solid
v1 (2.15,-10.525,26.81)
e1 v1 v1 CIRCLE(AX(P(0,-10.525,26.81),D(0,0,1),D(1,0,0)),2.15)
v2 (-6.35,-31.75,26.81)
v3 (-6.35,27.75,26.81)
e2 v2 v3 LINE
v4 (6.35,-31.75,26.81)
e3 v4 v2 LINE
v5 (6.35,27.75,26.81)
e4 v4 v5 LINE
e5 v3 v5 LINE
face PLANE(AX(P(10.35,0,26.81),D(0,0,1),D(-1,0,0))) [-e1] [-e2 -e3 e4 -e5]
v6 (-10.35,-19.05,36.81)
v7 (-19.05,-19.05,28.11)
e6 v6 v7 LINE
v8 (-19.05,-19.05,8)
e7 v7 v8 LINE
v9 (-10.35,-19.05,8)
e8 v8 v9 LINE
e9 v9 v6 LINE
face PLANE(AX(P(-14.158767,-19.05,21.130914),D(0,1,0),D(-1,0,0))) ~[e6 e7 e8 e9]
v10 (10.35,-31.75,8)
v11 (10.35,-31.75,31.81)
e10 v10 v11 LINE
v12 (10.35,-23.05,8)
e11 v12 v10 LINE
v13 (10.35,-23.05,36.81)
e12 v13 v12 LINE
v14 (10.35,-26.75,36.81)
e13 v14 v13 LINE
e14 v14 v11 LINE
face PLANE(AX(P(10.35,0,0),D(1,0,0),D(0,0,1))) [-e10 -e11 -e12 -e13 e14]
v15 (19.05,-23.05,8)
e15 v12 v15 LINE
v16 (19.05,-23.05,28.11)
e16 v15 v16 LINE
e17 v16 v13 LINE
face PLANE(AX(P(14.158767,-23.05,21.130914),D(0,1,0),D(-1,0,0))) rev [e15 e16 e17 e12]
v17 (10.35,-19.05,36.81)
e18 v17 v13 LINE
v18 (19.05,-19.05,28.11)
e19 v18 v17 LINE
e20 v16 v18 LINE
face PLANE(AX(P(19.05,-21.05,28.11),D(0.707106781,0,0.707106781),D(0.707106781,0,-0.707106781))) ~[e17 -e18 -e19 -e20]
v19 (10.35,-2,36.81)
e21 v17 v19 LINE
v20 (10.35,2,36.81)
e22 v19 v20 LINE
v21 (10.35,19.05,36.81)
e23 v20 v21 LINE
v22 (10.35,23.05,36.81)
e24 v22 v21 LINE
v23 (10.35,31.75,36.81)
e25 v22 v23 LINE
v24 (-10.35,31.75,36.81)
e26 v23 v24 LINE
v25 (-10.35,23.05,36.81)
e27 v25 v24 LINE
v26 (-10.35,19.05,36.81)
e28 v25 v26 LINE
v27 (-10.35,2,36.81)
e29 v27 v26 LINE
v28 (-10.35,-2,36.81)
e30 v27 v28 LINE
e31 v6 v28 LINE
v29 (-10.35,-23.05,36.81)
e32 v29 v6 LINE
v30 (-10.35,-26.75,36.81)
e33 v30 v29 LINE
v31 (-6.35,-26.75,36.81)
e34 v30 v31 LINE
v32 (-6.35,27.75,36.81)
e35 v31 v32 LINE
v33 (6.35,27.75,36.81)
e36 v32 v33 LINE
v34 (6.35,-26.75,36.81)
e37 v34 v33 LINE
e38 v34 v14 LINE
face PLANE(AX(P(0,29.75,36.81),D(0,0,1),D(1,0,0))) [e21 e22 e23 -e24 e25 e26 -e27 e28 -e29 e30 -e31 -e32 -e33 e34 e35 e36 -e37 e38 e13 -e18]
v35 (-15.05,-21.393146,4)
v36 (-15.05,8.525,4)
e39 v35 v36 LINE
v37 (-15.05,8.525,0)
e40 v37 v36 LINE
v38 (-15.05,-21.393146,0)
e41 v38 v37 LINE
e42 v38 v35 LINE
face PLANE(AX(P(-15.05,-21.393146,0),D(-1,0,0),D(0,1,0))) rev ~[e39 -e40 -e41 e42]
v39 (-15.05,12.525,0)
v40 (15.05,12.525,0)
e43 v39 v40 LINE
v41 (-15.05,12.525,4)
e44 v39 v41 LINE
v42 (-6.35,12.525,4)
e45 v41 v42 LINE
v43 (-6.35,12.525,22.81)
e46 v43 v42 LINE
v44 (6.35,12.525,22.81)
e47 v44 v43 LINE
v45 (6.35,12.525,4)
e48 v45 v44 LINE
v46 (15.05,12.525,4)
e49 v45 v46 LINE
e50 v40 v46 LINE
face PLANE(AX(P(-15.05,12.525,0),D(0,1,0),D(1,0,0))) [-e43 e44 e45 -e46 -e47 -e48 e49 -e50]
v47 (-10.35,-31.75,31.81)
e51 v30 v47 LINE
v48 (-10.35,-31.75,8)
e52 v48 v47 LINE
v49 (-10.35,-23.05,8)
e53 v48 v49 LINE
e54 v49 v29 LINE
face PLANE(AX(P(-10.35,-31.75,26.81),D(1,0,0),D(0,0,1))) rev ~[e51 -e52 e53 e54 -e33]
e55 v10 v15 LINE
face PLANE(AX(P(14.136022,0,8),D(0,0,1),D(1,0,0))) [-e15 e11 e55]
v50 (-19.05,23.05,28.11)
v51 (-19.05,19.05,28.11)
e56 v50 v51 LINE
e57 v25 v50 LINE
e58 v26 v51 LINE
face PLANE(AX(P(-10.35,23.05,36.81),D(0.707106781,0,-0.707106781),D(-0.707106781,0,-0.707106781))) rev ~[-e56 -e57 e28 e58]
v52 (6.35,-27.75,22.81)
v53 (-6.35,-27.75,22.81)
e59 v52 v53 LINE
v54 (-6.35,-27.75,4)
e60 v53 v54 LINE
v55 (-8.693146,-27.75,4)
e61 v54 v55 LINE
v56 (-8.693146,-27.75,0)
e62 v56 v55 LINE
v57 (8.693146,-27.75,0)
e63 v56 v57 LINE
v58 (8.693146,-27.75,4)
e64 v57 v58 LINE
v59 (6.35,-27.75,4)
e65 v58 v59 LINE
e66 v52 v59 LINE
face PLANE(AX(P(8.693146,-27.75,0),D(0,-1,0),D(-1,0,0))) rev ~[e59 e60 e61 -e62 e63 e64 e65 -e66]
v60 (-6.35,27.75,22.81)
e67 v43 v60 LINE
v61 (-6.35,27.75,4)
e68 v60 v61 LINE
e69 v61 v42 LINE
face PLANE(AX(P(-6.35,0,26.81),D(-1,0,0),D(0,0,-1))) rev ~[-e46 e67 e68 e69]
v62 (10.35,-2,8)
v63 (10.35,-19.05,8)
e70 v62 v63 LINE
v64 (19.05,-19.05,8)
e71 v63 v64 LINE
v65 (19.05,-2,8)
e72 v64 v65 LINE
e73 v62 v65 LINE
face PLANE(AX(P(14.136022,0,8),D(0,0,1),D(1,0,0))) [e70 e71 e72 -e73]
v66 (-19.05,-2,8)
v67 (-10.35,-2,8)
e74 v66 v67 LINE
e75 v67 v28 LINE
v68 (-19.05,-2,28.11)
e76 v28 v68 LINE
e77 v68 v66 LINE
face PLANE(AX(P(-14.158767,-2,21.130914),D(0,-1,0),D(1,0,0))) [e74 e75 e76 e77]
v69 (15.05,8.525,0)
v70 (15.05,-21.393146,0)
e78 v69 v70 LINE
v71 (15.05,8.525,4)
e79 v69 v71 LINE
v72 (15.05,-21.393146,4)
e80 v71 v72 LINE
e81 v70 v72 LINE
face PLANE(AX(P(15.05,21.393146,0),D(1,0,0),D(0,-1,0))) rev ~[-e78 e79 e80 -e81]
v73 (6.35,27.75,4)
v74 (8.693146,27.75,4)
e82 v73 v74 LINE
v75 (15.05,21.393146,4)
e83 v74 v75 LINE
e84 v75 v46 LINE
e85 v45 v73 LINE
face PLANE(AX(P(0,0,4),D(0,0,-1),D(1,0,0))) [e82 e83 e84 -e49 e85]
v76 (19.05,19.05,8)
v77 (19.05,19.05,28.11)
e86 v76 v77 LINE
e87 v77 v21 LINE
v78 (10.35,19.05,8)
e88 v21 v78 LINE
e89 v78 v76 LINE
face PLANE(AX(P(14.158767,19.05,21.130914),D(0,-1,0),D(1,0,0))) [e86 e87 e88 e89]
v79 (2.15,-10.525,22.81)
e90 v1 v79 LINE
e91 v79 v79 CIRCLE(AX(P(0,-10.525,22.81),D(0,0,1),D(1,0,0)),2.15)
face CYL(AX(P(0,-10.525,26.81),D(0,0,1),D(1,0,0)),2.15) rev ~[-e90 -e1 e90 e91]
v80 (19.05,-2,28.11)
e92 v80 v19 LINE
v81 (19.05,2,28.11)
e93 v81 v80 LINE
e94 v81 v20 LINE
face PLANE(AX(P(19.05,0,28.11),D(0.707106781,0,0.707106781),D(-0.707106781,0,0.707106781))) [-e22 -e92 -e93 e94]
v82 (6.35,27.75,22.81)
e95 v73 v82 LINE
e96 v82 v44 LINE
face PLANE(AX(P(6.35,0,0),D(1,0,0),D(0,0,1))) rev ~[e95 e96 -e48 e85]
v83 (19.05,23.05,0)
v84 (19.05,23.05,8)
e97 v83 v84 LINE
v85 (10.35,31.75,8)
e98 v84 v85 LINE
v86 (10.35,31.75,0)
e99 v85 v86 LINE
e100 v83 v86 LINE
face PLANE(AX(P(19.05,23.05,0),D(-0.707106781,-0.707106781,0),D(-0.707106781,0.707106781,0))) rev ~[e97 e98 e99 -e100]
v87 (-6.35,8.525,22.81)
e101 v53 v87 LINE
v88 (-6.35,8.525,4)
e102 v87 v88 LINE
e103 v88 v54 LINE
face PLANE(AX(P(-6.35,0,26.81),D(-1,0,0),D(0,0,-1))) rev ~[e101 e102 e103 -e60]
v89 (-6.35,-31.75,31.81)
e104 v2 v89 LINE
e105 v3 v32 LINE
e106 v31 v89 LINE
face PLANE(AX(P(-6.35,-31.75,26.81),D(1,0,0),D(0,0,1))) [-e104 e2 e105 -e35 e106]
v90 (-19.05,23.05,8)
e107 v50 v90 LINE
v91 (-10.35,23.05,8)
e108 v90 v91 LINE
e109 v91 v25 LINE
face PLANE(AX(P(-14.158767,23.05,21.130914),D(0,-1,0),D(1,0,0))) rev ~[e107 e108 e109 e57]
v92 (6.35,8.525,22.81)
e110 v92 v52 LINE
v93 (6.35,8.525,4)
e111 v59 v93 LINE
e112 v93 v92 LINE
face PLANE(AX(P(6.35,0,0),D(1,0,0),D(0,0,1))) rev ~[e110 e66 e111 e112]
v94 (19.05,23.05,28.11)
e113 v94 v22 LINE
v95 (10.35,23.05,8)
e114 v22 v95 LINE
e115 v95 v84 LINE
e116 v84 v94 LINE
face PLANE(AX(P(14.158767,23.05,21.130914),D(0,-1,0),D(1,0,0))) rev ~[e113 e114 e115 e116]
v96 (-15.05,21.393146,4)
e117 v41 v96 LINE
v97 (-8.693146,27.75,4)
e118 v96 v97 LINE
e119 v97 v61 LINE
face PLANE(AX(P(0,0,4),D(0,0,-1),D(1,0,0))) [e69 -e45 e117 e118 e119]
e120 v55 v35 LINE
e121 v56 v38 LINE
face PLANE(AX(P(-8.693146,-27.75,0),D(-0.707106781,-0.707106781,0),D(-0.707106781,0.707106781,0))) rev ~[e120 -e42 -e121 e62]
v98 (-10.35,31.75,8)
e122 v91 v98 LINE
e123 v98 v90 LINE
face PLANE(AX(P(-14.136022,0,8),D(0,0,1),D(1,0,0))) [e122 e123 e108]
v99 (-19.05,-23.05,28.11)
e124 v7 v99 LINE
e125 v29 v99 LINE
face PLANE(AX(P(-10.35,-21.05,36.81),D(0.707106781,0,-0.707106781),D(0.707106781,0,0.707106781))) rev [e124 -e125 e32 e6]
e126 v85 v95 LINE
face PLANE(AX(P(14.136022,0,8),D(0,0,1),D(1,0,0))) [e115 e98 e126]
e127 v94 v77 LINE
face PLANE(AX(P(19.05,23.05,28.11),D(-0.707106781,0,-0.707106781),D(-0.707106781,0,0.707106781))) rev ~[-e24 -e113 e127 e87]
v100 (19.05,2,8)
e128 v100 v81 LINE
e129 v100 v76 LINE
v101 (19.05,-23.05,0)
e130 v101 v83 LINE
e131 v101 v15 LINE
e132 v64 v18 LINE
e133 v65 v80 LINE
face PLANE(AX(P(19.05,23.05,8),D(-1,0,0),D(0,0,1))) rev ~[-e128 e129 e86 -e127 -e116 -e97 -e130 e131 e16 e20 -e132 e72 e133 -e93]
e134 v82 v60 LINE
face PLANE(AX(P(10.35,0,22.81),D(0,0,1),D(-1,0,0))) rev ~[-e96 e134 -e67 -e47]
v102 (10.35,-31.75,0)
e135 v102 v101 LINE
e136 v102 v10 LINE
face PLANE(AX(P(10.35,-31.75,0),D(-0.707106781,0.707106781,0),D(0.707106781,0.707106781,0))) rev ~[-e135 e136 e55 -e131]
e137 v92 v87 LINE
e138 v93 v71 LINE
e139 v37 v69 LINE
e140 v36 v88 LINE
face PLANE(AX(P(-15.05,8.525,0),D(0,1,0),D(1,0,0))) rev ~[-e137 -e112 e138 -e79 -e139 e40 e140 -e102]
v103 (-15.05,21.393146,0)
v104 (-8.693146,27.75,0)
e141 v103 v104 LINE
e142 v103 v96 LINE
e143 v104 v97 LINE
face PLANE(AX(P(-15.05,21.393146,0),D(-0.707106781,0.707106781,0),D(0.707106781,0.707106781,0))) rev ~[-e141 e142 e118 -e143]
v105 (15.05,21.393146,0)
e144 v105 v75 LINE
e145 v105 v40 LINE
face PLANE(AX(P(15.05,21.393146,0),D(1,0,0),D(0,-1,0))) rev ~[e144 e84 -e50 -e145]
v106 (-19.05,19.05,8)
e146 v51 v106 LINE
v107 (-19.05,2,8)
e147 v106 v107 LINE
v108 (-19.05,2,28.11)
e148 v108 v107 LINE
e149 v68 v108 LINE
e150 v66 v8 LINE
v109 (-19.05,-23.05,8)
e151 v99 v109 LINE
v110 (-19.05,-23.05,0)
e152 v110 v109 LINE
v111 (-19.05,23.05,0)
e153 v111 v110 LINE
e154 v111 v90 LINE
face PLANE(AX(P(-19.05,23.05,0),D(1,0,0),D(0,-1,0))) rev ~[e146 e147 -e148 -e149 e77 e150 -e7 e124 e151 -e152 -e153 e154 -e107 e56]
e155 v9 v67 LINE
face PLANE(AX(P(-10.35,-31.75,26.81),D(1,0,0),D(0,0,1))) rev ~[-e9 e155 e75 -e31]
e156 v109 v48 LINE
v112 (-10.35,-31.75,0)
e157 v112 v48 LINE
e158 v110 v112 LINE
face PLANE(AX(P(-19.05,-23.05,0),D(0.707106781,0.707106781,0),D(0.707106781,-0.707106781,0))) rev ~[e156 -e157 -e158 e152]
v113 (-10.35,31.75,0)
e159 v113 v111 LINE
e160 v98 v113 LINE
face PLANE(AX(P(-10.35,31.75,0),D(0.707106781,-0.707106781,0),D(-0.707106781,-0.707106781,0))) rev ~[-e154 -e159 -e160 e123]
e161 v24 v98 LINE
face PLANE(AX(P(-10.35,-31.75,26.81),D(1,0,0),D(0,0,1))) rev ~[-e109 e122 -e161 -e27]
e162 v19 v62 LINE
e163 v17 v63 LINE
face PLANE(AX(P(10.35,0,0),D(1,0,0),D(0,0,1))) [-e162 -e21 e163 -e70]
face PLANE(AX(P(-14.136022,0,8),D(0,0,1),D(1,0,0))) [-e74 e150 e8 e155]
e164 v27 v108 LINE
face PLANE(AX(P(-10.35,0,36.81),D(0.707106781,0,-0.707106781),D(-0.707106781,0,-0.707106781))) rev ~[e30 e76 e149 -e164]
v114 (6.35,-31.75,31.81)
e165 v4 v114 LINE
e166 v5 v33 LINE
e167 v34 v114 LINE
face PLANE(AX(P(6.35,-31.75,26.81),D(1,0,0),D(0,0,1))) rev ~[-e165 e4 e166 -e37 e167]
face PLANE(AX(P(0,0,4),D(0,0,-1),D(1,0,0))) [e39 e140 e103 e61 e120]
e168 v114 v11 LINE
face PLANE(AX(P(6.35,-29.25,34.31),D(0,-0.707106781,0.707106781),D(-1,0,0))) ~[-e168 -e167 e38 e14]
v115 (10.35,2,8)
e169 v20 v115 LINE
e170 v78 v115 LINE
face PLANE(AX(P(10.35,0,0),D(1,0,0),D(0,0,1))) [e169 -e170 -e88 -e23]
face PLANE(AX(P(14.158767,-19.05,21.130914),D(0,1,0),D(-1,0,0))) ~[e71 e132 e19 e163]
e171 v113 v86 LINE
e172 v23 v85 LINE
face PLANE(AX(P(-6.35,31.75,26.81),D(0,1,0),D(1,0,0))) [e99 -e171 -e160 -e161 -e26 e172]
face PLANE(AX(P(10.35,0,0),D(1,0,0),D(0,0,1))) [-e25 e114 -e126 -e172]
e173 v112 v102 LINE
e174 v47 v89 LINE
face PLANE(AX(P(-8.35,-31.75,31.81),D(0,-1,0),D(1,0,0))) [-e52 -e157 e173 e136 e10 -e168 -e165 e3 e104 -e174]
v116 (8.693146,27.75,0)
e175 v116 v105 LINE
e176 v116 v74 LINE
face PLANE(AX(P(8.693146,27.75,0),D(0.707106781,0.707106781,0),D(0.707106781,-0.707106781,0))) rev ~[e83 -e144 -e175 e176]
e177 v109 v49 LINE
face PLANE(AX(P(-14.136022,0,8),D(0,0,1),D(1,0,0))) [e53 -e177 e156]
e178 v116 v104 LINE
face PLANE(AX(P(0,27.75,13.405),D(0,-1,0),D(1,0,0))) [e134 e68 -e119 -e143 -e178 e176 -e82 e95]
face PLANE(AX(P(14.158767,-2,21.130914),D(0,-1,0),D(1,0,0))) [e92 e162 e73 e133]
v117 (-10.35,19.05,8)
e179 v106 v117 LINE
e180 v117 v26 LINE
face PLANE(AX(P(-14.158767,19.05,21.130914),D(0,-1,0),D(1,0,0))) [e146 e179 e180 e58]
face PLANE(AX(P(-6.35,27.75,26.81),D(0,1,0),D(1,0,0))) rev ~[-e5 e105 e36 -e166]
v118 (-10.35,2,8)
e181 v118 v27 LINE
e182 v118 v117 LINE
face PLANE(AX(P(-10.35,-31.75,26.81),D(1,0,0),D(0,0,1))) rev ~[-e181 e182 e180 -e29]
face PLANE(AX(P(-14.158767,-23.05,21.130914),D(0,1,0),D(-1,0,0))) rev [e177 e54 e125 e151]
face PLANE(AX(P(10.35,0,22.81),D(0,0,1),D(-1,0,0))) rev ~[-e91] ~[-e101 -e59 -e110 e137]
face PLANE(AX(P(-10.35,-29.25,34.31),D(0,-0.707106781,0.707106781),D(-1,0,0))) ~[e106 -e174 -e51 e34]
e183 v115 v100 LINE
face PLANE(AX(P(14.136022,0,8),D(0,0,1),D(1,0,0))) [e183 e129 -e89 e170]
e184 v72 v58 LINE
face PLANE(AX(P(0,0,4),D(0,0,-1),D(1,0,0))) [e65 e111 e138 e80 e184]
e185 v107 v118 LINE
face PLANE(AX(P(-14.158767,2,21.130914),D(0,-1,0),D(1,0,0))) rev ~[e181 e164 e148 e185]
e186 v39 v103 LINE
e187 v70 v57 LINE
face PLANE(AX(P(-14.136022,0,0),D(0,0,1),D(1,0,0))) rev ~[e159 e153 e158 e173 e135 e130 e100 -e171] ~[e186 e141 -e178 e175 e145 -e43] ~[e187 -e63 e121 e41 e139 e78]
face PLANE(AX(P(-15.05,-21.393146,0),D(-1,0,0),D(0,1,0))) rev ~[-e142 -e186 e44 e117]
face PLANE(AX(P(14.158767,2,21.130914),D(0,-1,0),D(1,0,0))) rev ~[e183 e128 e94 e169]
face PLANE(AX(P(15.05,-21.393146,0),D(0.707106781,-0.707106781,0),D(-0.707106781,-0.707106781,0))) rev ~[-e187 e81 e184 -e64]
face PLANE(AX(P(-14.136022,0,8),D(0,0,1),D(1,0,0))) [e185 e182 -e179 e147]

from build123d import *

# Parameters (mm, degrees)
F1_DEPTH  = 31.75
F2_T      = -4
F3_W      = 4
F3_H      = 10
F4_DEPTH  = 63.5
F6_DEPTH  = 8
F8_DEPTH  = 2
F11_DEPTH = 4
F13_DEPTH = 4
F14_W     = 12.7
F14_H     = 4
F15_DEPTH = 10
F16_SIZE  = 5
F17_R     = 2.15
F18_DEPTH = 25
F19_W     = 30.1
F19_H     = 4


# Not quite as in the source:
# - a pattern or mirror of a feature is missing from the dataset's text; its kind, count and spacing are read off the source's solid


with BuildPart() as f1:
    # F0 (on Front) → F1 (new body, symmetric)
    with BuildSketch(Plane.XZ):
        Polygon((-10.35, 0), (10.35, 0), (10.35, 26.81), (6.35, 26.81), (-6.35, 26.81), (-10.35, 26.81), align=None)
    extrude(amount=F1_DEPTH, both=True)

    # F2
    f2_openings = [f1.faces().sort_by_distance(p)[0] for p in [
        (0, 0, 0),
    ]]
    offset(amount=F2_T, openings=f2_openings)

    # F3 (on face) → F4 (join, through all)
    with BuildSketch(Plane.XZ.offset(31.75)):
        with Locations((-8.35, 31.81)):
            Rectangle(F3_W, F3_H)
        with Locations((8.35, 31.81)):
            Rectangle(F3_W, F3_H)
    extrude(amount=-F4_DEPTH)

    # F5 (on Top) → F6 (join)
    with BuildSketch(Plane.XY):
        Polygon((-19.05, -23.05), (-10.35, -31.75), (-10.35, 31.75), (-19.05, 23.05), align=None)
        Polygon((10.35, 31.75), (10.35, -31.75), (19.05, -23.05), (19.05, 23.05), align=None)
    extrude(amount=F6_DEPTH)

    # F7 (on Front) → F8 (join, symmetric)
    with BuildSketch(Plane.XZ):
        Polygon((-19.05, 8), (-10.35, 8), (-10.35, 36.81), (-19.05, 28.11), align=None)
        Polygon((10.35, 8), (19.05, 8), (19.05, 28.11), (10.35, 36.81), align=None)
    f8 = extrude(amount=F8_DEPTH, both=True)

    # F8_copies: F8 across plane
    add(f8.mirror(Plane(origin=(0, -10.525, 0), x_dir=(0, 0, -1), z_dir=(0, -1, 0))))

    # F10 (on plane+point) → F11 (join)
    with BuildSketch(Plane.XZ.offset(-23.05)):
        Polygon((10.35, 8), (19.05, 8), (19.05, 28.11), (10.35, 36.81), align=None)
        Polygon((-19.05, 28.11), (-19.05, 8), (-10.35, 8), (-10.35, 36.81), align=None)
    extrude(amount=F11_DEPTH)

    # F12 (on face) → F13 (cut)
    with BuildSketch(Plane(origin=(0, 0, 0), x_dir=(1, 0, 0), z_dir=(0, 0, -1))):
        Polygon((-8.6931457505, -27.75), (8.6931457505, -27.75), (15.05, -21.3931457505), (15.05, 21.3931457505), (8.6931457505, 27.75), (-8.6931457505, 27.75), (-15.05, 21.3931457505), (-15.05, -21.3931457505), align=None)
    extrude(amount=-F13_DEPTH, mode=Mode.SUBTRACT)

    # F14 (on face) → F15 (join, through all)
    with BuildSketch(Plane.XY.offset(26.81)):
        with Locations((0, 29.75)):
            Rectangle(F14_W, F14_H)
    extrude(amount=F15_DEPTH)

    # F16
    f16_edges = [f1.edges().sort_by_distance(p)[0] for p in [
        (8.35, -31.75, 36.81),
        (-8.35, -31.75, 36.81),
    ]]
    chamfer(f16_edges, length=F16_SIZE)

    # F17 (on face) → F18 (cut)
    with BuildSketch(Plane.XY.offset(26.81)):
        with Locations((0, -10.525)):
            Circle(F17_R)
    extrude(amount=-F18_DEPTH, mode=Mode.SUBTRACT)

    # F19 (on face) → F20 (join, up to the next surface of F1)
    with BuildSketch(Plane(origin=(0, 0, 0), x_dir=(1, 0, 0), z_dir=(0, 0, -1))):
        with Locations((0, -10.525)):
            Rectangle(F19_W, F19_H)
    extrude(until=Until.NEXT, dir=(0, 0, 1))


solid = f1.part
